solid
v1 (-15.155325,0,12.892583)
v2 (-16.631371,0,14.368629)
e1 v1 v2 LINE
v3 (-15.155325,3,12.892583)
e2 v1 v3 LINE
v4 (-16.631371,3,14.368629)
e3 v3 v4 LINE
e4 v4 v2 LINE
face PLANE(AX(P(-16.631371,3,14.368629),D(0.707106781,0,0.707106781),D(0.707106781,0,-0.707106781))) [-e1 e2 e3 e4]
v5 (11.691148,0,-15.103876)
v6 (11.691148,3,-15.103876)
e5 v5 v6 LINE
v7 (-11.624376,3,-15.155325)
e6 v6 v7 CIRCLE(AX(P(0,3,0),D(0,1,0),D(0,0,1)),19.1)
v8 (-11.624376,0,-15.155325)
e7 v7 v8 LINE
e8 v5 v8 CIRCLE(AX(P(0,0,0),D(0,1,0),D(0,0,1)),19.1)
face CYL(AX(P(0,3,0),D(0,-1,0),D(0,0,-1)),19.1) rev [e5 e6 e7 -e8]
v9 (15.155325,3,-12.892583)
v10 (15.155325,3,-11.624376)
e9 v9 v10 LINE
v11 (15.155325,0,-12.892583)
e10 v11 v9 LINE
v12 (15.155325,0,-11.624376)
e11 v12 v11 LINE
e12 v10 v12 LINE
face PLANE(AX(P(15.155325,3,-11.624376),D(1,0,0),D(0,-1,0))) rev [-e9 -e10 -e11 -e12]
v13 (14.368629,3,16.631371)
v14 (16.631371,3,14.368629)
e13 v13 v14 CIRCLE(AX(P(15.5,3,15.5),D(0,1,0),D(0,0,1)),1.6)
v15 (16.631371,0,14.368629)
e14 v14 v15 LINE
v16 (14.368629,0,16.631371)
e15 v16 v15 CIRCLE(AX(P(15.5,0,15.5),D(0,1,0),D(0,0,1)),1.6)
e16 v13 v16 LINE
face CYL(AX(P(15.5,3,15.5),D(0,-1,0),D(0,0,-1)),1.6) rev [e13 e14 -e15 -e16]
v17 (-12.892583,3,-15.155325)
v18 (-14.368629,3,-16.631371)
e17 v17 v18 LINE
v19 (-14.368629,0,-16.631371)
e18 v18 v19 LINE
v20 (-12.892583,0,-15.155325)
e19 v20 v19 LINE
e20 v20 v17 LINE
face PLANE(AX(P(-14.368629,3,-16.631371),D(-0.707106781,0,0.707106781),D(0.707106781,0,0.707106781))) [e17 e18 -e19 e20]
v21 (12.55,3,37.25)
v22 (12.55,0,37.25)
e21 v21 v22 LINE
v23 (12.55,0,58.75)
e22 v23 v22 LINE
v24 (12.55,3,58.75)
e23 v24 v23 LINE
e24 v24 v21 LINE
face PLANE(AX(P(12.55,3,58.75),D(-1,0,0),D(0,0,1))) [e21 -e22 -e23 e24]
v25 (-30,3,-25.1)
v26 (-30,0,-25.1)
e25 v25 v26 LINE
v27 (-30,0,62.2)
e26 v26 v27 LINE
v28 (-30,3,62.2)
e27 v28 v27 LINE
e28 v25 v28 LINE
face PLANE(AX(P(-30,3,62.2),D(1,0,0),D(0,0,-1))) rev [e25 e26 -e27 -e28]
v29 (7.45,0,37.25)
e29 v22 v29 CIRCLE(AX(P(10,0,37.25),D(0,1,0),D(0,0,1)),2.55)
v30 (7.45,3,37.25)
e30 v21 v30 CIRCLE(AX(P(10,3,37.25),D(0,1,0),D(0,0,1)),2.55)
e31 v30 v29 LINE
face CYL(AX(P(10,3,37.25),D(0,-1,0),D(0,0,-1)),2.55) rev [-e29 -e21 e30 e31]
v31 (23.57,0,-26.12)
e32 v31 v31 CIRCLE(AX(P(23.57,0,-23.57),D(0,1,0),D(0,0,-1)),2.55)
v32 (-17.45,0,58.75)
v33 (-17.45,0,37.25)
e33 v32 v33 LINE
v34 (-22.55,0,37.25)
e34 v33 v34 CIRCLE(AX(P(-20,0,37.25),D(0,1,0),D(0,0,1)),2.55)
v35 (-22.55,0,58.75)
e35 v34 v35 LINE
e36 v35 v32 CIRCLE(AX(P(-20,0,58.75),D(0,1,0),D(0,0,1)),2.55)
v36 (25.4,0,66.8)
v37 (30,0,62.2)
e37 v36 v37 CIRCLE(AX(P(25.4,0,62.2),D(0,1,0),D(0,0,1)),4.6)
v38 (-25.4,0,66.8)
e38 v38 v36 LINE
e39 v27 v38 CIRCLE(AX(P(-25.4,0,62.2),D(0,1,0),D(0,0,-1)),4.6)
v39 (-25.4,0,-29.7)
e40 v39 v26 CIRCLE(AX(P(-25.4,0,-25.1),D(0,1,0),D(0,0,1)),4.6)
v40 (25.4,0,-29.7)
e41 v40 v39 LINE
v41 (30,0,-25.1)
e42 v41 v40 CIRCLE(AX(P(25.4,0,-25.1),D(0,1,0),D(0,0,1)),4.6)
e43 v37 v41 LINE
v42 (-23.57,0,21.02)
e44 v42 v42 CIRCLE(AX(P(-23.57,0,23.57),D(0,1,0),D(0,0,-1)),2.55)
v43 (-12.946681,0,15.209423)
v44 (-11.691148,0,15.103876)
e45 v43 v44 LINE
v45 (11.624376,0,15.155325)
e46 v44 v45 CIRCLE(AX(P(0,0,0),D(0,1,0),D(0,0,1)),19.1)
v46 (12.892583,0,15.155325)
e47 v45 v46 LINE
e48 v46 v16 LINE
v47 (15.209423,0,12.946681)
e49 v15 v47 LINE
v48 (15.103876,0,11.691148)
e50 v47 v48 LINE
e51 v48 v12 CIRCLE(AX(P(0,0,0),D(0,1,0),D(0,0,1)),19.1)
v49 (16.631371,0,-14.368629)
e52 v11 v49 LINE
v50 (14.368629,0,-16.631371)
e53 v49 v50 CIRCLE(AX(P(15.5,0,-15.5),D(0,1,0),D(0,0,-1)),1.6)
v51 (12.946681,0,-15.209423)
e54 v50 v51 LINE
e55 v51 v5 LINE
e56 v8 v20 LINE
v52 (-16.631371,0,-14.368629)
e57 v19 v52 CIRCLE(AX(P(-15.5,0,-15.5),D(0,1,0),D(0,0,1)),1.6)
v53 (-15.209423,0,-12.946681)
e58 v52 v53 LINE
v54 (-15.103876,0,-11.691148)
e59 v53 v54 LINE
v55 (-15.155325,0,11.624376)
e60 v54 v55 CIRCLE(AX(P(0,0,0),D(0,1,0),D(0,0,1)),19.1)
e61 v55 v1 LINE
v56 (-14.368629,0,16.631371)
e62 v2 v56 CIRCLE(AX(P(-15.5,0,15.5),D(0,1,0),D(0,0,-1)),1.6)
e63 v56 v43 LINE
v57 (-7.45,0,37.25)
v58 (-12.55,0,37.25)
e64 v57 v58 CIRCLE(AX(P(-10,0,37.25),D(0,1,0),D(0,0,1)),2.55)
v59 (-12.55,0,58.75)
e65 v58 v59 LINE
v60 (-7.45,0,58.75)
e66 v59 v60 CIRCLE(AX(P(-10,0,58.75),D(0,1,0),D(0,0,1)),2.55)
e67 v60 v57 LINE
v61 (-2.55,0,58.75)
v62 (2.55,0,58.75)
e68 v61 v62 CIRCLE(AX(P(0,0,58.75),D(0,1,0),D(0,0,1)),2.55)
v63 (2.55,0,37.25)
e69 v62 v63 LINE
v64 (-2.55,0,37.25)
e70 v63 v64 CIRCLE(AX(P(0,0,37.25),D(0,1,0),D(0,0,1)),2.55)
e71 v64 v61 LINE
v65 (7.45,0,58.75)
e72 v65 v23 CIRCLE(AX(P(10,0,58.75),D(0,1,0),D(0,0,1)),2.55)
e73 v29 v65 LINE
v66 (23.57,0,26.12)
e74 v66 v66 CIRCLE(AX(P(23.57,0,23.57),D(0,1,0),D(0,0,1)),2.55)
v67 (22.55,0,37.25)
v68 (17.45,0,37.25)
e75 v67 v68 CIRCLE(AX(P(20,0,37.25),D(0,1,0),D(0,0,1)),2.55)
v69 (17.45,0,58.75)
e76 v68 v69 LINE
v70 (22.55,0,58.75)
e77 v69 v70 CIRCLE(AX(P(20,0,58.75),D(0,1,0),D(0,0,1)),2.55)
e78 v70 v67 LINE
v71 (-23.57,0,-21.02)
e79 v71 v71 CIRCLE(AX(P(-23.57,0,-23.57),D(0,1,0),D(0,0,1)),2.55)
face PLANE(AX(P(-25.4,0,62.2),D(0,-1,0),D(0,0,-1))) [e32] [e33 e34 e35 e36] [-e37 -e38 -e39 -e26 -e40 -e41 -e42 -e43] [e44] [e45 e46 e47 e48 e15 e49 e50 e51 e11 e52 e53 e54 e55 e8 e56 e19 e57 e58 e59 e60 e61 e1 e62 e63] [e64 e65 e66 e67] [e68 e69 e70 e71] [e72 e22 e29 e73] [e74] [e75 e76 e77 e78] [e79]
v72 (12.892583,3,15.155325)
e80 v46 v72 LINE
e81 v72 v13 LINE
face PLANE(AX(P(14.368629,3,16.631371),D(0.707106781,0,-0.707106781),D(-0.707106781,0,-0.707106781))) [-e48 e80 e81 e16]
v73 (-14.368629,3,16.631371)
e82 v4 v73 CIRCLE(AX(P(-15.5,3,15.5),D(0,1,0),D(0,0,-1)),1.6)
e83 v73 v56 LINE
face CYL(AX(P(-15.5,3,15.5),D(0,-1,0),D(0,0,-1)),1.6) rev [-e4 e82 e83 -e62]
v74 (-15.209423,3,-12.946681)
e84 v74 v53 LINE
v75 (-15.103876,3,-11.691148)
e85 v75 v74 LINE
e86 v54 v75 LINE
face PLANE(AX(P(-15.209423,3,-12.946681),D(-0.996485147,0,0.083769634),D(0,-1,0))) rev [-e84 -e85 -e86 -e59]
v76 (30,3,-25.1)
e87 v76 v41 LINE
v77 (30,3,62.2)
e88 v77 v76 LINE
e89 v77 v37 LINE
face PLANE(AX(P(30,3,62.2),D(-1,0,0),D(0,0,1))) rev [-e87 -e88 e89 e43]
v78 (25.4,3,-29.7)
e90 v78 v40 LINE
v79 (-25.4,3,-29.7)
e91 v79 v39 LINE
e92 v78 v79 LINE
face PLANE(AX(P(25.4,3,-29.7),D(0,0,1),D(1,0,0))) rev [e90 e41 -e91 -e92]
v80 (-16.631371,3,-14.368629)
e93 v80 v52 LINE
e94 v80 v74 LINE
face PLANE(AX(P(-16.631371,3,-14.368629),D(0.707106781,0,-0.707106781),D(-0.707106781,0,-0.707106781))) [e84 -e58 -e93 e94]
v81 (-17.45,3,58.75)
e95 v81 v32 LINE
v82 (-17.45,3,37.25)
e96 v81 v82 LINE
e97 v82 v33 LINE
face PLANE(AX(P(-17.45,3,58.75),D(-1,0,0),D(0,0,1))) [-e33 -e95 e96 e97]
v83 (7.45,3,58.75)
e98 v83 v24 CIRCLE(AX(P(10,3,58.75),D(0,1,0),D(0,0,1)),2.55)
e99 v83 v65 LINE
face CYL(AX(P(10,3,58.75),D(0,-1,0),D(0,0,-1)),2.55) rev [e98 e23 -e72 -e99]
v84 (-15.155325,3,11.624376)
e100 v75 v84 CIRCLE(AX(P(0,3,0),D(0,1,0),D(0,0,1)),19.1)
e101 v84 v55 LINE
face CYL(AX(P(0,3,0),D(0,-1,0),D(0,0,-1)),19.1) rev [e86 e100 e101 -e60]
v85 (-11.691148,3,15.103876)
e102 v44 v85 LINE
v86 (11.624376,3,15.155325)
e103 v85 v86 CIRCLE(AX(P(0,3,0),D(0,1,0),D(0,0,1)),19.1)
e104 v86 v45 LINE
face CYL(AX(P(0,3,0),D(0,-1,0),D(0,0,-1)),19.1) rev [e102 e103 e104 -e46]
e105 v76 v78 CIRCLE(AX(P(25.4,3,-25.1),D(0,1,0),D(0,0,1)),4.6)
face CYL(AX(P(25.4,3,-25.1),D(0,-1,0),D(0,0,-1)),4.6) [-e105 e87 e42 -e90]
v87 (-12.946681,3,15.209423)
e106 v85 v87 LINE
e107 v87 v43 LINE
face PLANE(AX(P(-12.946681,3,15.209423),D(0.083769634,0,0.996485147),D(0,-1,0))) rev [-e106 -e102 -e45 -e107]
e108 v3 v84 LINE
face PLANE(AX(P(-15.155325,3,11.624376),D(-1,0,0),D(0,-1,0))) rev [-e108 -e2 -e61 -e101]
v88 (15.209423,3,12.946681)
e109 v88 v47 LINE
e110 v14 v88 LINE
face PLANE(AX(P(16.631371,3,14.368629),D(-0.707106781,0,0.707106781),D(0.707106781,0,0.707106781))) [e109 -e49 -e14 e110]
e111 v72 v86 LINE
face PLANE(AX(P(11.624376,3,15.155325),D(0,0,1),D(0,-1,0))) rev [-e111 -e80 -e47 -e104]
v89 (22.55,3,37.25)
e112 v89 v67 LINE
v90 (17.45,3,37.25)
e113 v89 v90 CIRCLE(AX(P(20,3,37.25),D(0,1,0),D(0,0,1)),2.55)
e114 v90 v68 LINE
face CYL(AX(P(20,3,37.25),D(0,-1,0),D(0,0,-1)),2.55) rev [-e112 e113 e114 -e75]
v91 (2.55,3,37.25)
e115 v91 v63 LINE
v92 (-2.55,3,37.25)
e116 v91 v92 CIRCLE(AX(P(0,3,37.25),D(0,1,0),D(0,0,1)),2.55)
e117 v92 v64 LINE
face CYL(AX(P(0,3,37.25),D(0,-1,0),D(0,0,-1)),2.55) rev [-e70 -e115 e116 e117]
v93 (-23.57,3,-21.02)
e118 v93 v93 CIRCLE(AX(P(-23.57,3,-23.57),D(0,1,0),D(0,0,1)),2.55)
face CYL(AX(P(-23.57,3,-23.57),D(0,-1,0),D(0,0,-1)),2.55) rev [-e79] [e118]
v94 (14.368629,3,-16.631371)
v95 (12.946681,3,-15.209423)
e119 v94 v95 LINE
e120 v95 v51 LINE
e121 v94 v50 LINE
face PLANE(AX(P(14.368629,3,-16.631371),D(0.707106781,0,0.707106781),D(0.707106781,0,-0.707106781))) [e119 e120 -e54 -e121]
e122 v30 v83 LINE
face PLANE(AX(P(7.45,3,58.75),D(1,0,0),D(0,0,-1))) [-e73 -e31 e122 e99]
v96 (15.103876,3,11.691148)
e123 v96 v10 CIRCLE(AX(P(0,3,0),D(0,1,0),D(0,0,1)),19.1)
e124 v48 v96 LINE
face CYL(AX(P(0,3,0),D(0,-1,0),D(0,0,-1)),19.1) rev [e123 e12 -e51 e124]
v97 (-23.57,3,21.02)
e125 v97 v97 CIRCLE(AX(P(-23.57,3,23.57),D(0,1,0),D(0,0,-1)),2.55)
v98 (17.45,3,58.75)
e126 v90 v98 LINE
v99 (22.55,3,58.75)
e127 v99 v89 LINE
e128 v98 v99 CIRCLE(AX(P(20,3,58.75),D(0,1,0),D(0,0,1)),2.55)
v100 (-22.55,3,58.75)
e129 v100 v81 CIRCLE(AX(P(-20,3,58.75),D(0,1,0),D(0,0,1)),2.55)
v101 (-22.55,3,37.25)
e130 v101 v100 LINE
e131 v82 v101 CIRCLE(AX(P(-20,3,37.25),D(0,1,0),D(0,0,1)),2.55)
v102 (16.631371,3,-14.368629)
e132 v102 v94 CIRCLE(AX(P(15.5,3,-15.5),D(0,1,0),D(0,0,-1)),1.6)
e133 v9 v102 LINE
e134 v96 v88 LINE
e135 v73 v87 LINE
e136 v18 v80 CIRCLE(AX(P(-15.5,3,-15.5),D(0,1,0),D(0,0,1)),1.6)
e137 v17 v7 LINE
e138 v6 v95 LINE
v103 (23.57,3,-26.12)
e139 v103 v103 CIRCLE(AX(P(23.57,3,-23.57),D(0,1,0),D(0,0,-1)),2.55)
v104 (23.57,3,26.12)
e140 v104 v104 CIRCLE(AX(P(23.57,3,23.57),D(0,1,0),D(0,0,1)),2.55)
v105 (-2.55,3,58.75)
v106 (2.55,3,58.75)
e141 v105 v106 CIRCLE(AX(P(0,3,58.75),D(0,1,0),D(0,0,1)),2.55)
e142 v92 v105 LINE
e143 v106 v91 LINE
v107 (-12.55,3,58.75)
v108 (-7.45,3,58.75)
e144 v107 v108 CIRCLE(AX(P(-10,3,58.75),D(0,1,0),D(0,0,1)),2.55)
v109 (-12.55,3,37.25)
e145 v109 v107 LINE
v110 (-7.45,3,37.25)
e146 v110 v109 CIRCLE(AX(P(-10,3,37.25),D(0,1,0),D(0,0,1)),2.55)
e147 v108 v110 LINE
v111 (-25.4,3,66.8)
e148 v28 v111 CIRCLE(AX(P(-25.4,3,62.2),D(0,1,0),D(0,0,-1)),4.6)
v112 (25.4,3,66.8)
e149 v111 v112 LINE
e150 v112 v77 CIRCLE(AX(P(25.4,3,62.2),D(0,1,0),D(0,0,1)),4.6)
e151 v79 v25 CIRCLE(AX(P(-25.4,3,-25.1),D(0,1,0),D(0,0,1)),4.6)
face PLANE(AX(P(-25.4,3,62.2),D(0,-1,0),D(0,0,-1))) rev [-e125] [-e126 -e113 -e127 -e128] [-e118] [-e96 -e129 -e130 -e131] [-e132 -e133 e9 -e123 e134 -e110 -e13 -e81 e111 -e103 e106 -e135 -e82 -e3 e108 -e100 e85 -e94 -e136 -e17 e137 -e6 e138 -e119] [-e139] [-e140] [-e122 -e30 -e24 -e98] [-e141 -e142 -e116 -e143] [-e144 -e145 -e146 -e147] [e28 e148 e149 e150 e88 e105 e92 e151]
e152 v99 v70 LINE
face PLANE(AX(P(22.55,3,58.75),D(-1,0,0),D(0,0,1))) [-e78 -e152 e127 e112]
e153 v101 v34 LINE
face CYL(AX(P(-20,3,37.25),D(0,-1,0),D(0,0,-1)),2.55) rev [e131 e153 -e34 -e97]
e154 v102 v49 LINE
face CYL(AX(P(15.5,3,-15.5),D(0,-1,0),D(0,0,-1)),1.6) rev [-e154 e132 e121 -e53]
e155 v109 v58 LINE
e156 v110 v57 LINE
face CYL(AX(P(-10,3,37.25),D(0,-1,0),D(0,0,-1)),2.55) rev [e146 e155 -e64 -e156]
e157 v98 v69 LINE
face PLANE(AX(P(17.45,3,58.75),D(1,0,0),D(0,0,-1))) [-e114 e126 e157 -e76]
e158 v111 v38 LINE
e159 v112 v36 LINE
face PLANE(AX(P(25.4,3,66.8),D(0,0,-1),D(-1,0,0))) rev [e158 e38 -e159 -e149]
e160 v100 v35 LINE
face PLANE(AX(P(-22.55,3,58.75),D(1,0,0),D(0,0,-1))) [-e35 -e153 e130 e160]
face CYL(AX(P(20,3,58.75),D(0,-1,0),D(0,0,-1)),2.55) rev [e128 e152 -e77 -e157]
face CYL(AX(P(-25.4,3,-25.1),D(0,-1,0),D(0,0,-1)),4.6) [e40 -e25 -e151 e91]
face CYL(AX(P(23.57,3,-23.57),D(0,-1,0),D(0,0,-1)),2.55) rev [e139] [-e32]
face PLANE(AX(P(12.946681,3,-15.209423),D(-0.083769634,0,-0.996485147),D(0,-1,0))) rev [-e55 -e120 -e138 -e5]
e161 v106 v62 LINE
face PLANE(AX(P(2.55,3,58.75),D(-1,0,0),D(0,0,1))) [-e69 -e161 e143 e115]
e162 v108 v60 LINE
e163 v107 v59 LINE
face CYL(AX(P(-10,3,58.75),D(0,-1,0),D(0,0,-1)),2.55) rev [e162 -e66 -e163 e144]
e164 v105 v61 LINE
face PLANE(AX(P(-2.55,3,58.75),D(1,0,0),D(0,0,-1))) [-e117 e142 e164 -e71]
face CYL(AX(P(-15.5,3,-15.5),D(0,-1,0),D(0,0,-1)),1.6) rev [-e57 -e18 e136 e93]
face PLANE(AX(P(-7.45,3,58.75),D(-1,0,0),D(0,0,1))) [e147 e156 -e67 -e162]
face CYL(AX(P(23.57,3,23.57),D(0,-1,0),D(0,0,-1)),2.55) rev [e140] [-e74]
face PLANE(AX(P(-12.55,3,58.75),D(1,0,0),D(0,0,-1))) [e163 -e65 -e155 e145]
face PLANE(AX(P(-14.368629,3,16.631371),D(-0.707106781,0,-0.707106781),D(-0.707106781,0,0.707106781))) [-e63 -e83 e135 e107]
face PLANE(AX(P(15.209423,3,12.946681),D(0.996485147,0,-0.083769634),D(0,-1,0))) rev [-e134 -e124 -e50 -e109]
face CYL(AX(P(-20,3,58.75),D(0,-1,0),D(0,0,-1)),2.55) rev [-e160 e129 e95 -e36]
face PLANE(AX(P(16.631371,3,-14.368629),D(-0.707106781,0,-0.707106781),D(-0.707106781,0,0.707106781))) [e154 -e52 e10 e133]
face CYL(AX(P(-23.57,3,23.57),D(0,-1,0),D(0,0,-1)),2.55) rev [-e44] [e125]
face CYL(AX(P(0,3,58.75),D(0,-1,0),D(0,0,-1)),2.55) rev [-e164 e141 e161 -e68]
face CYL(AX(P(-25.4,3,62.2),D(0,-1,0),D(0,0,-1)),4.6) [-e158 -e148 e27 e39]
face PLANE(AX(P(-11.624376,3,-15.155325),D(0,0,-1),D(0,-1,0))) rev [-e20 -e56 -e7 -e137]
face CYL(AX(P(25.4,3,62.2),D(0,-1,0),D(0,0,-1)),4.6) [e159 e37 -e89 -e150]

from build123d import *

# Parameters (mm, degrees)
SKETCH1_R           = 2.55
BOSS_EXTRUDE1_DEPTH = 3
CHAMFER1_SIZE       = 0.876505316
CHAMFER1_SIZE_2     = 0.8


with BuildPart() as part:
    # Sketch1 → Boss-Extrude1 (new body)
    with BuildSketch(Plane(origin=(0, 0, 0), x_dir=(1, 0, 0), z_dir=(0, 1, 0))):
        with BuildLine():
            Line((25.4, -66.8), (-25.4, -66.8))
            ThreePointArc((-25.4, -66.8), (-28.652691193, -65.452691193), (-30, -62.2))
            Line((-30, -62.2), (-30, 25.1))
            ThreePointArc((-30, 25.1), (-28.652691193, 28.352691193), (-25.4, 29.7))
            Line((-25.4, 29.7), (25.4, 29.7))
            ThreePointArc((25.4, 29.7), (28.652691193, 28.352691193), (30, 25.1))
            Line((30, 25.1), (30, -62.2))
            ThreePointArc((30, -62.2), (28.652691193, -65.452691193), (25.4, -66.8))
        make_face()
        with Locations(Location((-23.57, 23.57, 0), (0, 0, 270))):
            Circle(SKETCH1_R, mode=Mode.SUBTRACT)
        with Locations(Location((23.57, 23.57, 0), (0, 0, 90))):
            Circle(SKETCH1_R, mode=Mode.SUBTRACT)
        with Locations(Location((23.57, -23.57, 0), (0, 0, 270))):
            Circle(SKETCH1_R, mode=Mode.SUBTRACT)
        with Locations(Location((-23.57, -23.57, 0), (0, 0, 90))):
            Circle(SKETCH1_R, mode=Mode.SUBTRACT)
        with BuildLine():
            Line((17.45, -58.75), (17.45, -37.25))
            ThreePointArc((17.45, -37.25), (20, -34.7), (22.55, -37.25))
            Line((22.55, -37.25), (22.55, -58.75))
            ThreePointArc((22.55, -58.75), (20, -61.3), (17.45, -58.75))
        make_face(mode=Mode.SUBTRACT)
        with BuildLine():
            Line((7.45, -58.75), (7.45, -37.25))
            ThreePointArc((7.45, -37.25), (10, -34.7), (12.55, -37.25))
            Line((12.55, -37.25), (12.55, -58.75))
            ThreePointArc((12.55, -58.75), (10, -61.3), (7.45, -58.75))
        make_face(mode=Mode.SUBTRACT)
        with BuildLine():
            Line((-2.55, -58.75), (-2.55, -37.25))
            ThreePointArc((-2.55, -37.25), (0, -34.7), (2.55, -37.25))
            Line((2.55, -37.25), (2.55, -58.75))
            ThreePointArc((2.55, -58.75), (0, -61.3), (-2.55, -58.75))
        make_face(mode=Mode.SUBTRACT)
        with BuildLine():
            Line((-12.55, -58.75), (-12.55, -37.25))
            ThreePointArc((-12.55, -37.25), (-10, -34.7), (-7.45, -37.25))
            Line((-7.45, -37.25), (-7.45, -58.75))
            ThreePointArc((-7.45, -58.75), (-10, -61.3), (-12.55, -58.75))
        make_face(mode=Mode.SUBTRACT)
        with BuildLine():
            Line((-22.55, -58.75), (-22.55, -37.25))
            ThreePointArc((-22.55, -37.25), (-20, -34.7), (-17.45, -37.25))
            Line((-17.45, -37.25), (-17.45, -58.75))
            ThreePointArc((-17.45, -58.75), (-20, -61.3), (-22.55, -58.75))
        make_face(mode=Mode.SUBTRACT)
        with BuildLine():
            Line((14.36862915, 16.63137085), (12.326897984, 14.589639684))
            ThreePointArc((12.326897984, 14.589639684), (0, 19.1), (-12.326897984, 14.589639684))
            Line((-12.326897984, 14.589639684), (-14.36862915, 16.63137085))
            ThreePointArc((-14.36862915, 16.63137085), (-16.63137085, 16.63137085), (-16.63137085, 14.36862915))
            Line((-16.63137085, 14.36862915), (-14.589639684, 12.326897984))
            ThreePointArc((-14.589639684, 12.326897984), (-19.1, 0), (-14.589639684, -12.326897984))
            Line((-14.589639684, -12.326897984), (-16.63137085, -14.36862915))
            ThreePointArc((-16.63137085, -14.36862915), (-16.63137085, -16.63137085), (-14.36862915, -16.63137085))
            Line((-14.36862915, -16.63137085), (-12.326897984, -14.589639684))
            ThreePointArc((-12.326897984, -14.589639684), (0, -19.1), (12.326897984, -14.589639684))
            Line((12.326897984, -14.589639684), (14.36862915, -16.63137085))
            ThreePointArc((14.36862915, -16.63137085), (16.63137085, -16.63137085), (16.63137085, -14.36862915))
            Line((16.63137085, -14.36862915), (14.589639684, -12.326897984))
            ThreePointArc((14.589639684, -12.326897984), (19.1, 0), (14.589639684, 12.326897984))
            Line((14.589639684, 12.326897984), (16.63137085, 14.36862915))
            ThreePointArc((16.63137085, 14.36862915), (16.63137085, 16.63137085), (14.36862915, 16.63137085))
        make_face(mode=Mode.SUBTRACT)
    extrude(amount=BOSS_EXTRUDE1_DEPTH)

    # Chamfer1
    # the kernel refuses this chamfer: 0.876505316, 0.8 mm, written as the material it takes off along each edge
    with BuildSketch(Plane(origin=(-14.589639684, -2.258924043, -12.326897984), x_dir=(-0.7071067811865476, 0, -0.7071067811865476), z_dir=(0, 1, 0)), Plane(origin=(-12.326897984, -2.258924043, 14.589639684), x_dir=(-0.7071067811865435, 0, 0.7071067811865516), z_dir=(0, 1, 0)), Plane(origin=(14.589639684, -2.258924043, 12.326897984), x_dir=(0.7071067811865475, 0, 0.7071067811865475), z_dir=(0, 1, 0)), Plane(origin=(12.326897984, -2.258924043, -14.589639684), x_dir=(0.7071067811865465, 0, -0.7071067811865486), z_dir=(0, 1, 0))) as chamfer1_piece_1:
        with BuildLine():
            Line((CHAMFER1_SIZE, 0), (-0.085923492, 0.81316345))
            ThreePointArc((-0.085923492, 0.81316345), (-0.039945159, 0.419640102), (0, 0))
            Line((0, 0), (CHAMFER1_SIZE, 0))
        make_face()
    extrude(amount=7.517848085, mode=Mode.SUBTRACT)
    with BuildSketch(Plane(origin=(-14.589639684, -2.323826689, 12.326897984), x_dir=(-0.6271715557767805, 0, -0.7788811460194248), z_dir=(0, 1, 0)), Plane(origin=(12.326897984, -2.323826689, 14.589639684), x_dir=(-0.7788811460194289, 0, 0.6271715557767755), z_dir=(0, 1, 0)), Plane(origin=(14.589639684, -2.323826689, -12.326897984), x_dir=(0.6271715557767805, 0, 0.7788811460194248), z_dir=(0, 1, 0)), Plane(origin=(-12.326897984, -2.323826689, -14.589639684), x_dir=(0.7788811460194278, 0, -0.6271715557767769), z_dir=(0, 1, 0))) as chamfer1_piece_2:
        with BuildLine():
            Line((0.90196282, 0), (-CHAMFER1_SIZE_2 * 0.107274880032, CHAMFER1_SIZE_2 * 0.994229400146))
            Line((-CHAMFER1_SIZE_2 * 0.107274880032, CHAMFER1_SIZE_2 * 0.994229400146), (0, 0))
            ThreePointArc((0, 0), (0.464646952, 0.005320048), (0.90196282, 0))
        make_face()
    extrude(amount=7.647653377, mode=Mode.SUBTRACT)


solid = part.part
